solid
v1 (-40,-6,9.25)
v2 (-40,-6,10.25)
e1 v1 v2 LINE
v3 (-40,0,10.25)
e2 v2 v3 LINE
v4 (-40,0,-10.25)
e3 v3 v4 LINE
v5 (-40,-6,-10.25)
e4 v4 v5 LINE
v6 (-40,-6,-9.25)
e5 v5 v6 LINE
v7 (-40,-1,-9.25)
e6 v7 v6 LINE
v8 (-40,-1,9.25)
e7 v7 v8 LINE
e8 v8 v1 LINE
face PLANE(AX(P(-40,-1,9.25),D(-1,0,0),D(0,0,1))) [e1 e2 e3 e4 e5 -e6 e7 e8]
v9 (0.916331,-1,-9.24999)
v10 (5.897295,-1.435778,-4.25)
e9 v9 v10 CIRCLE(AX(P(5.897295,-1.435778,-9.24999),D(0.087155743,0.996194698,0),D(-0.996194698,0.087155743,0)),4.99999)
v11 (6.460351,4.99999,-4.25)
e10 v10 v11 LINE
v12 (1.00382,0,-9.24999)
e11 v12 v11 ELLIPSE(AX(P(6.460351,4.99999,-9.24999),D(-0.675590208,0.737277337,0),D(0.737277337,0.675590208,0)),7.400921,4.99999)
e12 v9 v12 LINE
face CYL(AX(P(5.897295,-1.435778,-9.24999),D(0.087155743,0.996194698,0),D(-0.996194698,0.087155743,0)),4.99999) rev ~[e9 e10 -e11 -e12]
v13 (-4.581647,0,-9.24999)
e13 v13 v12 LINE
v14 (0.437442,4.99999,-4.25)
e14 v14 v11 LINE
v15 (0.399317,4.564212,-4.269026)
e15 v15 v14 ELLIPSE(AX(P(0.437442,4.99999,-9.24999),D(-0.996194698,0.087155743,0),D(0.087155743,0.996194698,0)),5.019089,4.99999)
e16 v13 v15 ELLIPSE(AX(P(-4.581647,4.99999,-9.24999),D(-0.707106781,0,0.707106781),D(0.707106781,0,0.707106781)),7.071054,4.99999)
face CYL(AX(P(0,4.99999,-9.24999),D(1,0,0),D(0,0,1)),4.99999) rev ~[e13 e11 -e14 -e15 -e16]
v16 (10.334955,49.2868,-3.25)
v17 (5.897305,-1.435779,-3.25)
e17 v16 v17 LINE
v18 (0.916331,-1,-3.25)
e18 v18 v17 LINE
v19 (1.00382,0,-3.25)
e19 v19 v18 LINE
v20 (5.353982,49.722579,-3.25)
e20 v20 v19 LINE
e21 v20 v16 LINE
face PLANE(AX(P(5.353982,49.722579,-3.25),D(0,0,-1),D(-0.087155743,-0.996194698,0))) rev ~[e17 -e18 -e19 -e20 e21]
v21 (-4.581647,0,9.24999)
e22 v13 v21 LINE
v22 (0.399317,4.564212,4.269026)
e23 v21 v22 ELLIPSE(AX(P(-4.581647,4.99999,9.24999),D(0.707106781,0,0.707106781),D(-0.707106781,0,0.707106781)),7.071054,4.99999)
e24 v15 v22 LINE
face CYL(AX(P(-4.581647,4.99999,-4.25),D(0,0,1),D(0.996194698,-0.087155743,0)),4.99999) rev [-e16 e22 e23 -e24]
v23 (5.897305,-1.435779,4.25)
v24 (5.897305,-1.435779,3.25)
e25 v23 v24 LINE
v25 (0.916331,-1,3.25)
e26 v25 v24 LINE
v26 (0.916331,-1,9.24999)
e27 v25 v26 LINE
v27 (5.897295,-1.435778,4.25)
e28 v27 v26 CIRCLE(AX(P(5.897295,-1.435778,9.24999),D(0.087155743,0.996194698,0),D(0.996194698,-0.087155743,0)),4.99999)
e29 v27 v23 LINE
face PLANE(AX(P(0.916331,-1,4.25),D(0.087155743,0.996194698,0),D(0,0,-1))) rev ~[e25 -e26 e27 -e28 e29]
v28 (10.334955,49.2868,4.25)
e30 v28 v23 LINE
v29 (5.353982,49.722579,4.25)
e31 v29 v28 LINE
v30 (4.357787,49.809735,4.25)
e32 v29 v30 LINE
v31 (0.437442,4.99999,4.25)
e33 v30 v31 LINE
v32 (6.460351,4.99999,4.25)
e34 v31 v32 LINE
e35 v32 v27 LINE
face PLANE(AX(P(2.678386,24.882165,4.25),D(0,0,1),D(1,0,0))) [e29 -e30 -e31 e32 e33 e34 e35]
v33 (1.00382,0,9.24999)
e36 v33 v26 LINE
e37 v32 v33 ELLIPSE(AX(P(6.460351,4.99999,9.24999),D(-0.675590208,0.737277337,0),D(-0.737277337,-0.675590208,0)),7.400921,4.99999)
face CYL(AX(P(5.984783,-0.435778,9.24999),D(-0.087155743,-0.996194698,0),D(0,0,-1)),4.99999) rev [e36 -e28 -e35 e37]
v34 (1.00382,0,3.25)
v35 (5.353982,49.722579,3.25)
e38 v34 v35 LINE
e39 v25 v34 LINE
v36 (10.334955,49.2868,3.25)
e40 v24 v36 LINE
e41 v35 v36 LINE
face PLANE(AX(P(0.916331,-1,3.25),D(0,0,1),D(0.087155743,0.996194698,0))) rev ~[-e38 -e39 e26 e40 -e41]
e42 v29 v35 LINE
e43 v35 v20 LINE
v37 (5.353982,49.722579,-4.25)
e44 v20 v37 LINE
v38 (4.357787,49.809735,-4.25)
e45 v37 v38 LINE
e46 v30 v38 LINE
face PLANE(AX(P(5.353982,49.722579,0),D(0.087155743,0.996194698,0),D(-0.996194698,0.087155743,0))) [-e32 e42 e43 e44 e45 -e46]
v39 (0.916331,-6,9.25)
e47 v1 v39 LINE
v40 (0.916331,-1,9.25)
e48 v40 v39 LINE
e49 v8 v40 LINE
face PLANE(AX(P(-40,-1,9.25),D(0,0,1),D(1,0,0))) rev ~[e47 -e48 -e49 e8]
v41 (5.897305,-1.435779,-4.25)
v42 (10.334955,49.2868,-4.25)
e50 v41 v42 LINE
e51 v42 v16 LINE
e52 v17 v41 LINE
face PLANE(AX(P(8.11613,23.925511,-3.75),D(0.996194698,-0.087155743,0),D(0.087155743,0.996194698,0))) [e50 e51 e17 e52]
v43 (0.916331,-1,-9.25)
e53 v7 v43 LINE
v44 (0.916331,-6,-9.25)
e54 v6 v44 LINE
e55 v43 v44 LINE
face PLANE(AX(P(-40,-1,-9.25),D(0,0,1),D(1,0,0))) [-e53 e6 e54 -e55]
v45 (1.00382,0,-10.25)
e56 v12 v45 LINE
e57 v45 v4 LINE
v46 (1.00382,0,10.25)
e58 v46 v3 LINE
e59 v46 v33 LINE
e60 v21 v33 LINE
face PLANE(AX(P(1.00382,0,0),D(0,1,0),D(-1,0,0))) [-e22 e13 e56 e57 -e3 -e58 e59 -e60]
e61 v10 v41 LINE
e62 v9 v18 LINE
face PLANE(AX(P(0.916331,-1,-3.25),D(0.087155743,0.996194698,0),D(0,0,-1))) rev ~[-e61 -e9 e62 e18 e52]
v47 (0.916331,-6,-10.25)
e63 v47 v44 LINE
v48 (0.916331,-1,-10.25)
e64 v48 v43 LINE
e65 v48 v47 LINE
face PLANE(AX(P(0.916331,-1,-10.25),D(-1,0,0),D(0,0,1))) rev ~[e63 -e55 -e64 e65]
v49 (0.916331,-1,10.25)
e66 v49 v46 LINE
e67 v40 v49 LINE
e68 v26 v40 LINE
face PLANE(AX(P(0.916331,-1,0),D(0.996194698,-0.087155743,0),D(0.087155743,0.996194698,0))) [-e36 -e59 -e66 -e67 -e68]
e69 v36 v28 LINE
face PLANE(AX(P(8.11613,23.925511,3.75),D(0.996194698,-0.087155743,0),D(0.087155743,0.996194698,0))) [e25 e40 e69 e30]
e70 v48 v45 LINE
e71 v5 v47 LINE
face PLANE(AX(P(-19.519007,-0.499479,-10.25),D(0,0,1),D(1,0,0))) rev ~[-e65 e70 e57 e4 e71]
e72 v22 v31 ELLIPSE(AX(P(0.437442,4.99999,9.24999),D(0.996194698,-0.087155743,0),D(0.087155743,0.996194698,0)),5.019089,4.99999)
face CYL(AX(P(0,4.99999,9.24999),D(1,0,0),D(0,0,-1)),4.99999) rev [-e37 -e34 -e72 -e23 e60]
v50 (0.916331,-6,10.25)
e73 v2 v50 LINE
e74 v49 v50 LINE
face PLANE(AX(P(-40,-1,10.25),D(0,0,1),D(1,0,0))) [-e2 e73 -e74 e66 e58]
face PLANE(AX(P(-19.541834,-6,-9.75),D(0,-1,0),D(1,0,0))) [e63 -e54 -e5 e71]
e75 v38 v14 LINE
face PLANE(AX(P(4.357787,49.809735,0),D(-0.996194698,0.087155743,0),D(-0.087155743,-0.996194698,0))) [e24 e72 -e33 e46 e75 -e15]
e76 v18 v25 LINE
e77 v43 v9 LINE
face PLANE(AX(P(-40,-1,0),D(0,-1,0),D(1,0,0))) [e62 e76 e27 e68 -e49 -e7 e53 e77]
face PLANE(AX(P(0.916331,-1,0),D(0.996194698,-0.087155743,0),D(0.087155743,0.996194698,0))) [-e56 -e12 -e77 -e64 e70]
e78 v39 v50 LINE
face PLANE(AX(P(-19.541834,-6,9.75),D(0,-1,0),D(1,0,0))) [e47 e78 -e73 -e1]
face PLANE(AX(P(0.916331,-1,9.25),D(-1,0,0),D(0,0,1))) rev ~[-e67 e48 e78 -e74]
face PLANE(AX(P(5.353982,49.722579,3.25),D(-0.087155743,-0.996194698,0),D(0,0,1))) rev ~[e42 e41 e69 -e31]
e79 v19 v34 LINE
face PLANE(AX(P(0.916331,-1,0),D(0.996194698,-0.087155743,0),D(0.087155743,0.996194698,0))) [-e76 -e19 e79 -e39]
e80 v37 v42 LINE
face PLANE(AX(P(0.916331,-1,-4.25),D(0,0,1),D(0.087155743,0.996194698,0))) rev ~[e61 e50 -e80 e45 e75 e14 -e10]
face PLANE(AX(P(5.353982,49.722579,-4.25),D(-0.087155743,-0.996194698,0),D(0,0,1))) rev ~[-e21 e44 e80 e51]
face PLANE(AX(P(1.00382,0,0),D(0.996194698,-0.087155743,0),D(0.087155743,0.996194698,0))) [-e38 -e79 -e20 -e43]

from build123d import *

# Parameters (mm, degrees)
F1_DEPTH = 10.25
F2_DEPTH = 4.25
F4_DEPTH = 5
F5_W     = 40.916331174
F5_H     = 1
F6_DEPTH = 5
F7_R     = 4.99999


# Not quite as in the source:
# - a fillet or chamfer is up to 0.001 mm smaller than in the source, because OpenCascade refuses the exact size


with BuildPart() as f1:
    # F0 (on Top) → F1 (new body, symmetric)
    with BuildSketch(Plane.XY):
        Polygon((0, 0), (-40, 0), (-40, -1), (0.916331174, -1), (1.0038198375, 0), align=None)
    extrude(amount=F1_DEPTH, both=True)

    # F0 (on Top) → F2 (join, symmetric)
    with BuildSketch(Plane.XY):
        Polygon((4.3577871374, 49.8097349046), (0, 0), (1.0038198375, 0), (5.3539818355, 49.7225791618), align=None)
    extrude(amount=F2_DEPTH, both=True)

    # F3 (on face) → F4 (join)
    with BuildSketch(Plane(origin=(0.9961946981, -0.0871557427, 0), x_dir=(0.0871557427, 0.9961946981, 0), z_dir=(0.9961946981, -0.0871557427, 0))):
        Polygon((50, -4.25), (50, -3.25), (-0.916331174, -3.25), (-0.916331174, -4.25), (0.0874886635, -4.25), align=None)
        Polygon((-0.916331174, 3.25), (50, 3.25), (50, 4.25), (0.0874886635, 4.25), (-0.916331174, 4.25), align=None)
    extrude(amount=F4_DEPTH)

    # F5 (on face) → F6 (join)
    with BuildSketch(Plane.XZ.offset(1)):
        with Locations((-19.541834413, 9.75)):
            Rectangle(F5_W, F5_H)
        with Locations((-19.541834413, -9.75)):
            Rectangle(F5_W, F5_H)
    extrude(amount=F6_DEPTH)

    # F7 (radius 5 in the source; OpenCascade refuses exactly that, so slightly less here)
    f7_edges = [f1.edges().sort_by_distance(p)[0] for p in [
        (0.960076, -0.5, -4.25),
        (0.960076, -0.5, 4.25),
        (0.50191, 0, 4.25),
        (0.50191, 0, -4.25),
        (0, 0, 0),
    ]]
    fillet(f7_edges, radius=F7_R)


solid = f1.part
